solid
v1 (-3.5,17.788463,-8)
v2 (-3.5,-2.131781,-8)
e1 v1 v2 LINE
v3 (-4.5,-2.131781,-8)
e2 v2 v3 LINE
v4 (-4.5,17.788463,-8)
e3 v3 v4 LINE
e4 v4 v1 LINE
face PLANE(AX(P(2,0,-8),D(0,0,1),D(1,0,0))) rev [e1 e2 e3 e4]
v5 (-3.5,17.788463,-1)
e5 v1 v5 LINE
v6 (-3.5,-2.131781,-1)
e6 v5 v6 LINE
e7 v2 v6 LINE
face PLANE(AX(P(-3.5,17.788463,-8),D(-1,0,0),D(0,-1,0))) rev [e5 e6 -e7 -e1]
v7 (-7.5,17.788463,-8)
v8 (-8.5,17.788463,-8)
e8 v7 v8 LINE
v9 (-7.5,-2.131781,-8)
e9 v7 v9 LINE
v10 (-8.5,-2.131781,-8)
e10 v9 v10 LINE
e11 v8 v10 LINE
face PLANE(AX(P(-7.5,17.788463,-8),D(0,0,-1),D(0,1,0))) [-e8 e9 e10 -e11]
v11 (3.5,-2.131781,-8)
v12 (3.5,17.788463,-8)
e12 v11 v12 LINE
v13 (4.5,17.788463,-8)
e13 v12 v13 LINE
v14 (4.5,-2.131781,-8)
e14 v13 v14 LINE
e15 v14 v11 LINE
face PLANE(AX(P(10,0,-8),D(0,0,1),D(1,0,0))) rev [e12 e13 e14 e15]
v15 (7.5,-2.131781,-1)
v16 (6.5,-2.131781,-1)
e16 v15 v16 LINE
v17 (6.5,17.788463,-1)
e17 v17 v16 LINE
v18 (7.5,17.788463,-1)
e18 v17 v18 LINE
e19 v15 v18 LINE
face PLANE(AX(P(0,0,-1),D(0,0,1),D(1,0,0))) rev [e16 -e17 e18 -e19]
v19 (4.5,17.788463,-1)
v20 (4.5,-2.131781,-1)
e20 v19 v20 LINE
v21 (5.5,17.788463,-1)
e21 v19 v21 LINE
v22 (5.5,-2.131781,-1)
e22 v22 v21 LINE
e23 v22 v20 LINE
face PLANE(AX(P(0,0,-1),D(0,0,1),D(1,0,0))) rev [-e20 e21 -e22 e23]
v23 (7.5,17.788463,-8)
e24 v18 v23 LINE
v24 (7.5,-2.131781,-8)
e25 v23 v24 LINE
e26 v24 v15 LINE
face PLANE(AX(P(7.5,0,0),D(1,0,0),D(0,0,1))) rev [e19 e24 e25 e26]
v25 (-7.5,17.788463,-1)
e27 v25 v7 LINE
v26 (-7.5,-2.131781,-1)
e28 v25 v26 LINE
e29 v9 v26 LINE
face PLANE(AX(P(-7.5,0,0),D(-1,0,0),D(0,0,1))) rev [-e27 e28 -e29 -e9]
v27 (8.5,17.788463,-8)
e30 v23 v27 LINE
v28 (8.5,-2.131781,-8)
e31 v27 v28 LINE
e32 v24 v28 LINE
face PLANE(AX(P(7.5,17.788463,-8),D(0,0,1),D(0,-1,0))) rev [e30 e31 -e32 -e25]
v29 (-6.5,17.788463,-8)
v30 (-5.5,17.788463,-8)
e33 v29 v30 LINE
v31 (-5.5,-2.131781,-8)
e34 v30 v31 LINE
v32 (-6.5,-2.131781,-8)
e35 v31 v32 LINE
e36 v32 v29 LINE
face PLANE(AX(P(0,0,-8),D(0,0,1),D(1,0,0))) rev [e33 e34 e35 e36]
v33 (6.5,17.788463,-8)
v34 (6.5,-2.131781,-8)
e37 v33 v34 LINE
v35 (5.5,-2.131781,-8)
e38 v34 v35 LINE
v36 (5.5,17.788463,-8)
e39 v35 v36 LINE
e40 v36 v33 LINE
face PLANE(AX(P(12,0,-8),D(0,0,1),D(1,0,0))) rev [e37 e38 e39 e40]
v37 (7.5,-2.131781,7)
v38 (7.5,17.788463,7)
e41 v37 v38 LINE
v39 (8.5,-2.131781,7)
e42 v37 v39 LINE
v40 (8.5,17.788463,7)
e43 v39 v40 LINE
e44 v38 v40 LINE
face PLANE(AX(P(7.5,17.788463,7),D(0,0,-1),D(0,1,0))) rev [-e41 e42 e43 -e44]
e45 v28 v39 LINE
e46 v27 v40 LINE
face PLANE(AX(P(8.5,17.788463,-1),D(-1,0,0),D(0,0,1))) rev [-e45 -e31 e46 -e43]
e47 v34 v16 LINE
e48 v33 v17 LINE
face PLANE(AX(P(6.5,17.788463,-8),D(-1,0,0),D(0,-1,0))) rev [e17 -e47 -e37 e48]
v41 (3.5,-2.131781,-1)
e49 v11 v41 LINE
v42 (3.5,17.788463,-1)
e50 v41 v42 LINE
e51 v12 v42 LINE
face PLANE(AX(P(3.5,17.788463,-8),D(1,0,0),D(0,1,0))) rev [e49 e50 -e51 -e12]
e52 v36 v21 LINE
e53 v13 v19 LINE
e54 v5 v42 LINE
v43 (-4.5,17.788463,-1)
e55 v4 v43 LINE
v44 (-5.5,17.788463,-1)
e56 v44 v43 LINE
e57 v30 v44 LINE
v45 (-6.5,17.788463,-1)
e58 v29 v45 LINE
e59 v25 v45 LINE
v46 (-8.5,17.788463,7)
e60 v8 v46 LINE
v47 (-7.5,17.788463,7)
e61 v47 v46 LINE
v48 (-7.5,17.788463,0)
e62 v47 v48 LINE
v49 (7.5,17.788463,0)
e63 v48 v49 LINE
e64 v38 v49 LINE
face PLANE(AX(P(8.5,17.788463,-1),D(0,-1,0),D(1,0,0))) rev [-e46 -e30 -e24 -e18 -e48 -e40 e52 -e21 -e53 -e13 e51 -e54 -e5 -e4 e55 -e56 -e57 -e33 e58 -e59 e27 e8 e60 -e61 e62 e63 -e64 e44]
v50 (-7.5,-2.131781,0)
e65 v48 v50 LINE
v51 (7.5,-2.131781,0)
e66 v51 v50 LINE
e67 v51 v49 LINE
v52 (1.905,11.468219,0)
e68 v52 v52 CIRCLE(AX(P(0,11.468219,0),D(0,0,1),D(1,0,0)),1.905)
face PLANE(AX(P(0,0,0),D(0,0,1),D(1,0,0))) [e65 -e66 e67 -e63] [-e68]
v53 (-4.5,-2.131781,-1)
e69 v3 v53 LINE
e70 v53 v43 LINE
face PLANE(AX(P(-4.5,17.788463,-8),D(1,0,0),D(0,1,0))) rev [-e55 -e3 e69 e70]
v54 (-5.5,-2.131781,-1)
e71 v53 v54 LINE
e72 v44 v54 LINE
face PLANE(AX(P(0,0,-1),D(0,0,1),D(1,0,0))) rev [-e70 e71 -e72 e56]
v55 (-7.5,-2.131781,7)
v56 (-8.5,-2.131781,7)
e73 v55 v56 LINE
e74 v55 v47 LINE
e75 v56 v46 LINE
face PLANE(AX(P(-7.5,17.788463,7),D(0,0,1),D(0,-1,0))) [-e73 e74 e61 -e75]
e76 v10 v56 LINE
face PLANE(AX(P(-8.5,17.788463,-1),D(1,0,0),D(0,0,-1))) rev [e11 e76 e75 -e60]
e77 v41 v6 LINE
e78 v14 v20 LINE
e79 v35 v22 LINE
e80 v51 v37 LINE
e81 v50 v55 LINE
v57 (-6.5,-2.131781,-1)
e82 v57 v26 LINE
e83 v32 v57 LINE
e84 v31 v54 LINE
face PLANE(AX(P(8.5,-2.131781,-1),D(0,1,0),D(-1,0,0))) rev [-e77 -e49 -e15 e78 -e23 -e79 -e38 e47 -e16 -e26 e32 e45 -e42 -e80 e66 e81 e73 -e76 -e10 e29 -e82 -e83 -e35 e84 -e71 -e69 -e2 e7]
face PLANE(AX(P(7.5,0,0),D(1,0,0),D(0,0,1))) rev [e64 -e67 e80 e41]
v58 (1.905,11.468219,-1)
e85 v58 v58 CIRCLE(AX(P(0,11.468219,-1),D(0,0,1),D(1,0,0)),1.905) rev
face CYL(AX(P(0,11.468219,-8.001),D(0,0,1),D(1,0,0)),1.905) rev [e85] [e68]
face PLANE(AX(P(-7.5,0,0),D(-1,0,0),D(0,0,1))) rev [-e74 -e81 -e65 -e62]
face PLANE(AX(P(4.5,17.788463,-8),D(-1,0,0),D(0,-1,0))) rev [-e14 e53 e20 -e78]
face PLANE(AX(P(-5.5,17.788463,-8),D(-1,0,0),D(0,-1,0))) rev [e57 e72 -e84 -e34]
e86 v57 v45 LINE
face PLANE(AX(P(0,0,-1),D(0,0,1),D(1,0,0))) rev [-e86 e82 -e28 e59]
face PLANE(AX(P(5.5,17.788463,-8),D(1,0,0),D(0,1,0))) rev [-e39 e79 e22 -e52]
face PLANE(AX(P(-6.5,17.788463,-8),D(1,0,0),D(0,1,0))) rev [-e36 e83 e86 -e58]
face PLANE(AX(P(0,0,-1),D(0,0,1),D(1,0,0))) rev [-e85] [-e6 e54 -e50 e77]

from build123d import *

# Parameters (mm, degrees)
SKETCH11_W              = 17
SKETCH11_H              = 19.920243607
BOSS_EXTRUDE7_DEPTH     = 1
BOSS_EXTRUDE5_START     = -2.131780543
BOSS_EXTRUDE5_OUTLINE_W = 1
BOSS_EXTRUDE5_OUTLINE_H = 7
BOSS_EXTRUDE5_DEPTH     = 19.920243607
SKETCH13_W              = 1
SKETCH13_H              = 19.920243607
BOSS_EXTRUDE6_DEPTH     = 7
LPATTERN3_COUNT         = 7
LPATTERN3_PITCH         = 2
CUT_EXTRUDE1_REACH      = 23.276
SKETCH14_R              = 1.905


# Read off the part's stored shape, not the designer's step: Boss-Extrude5
with BuildPart() as part:
    # Sketch11 (on Front Plane) → Boss-Extrude7 (new body)
    with BuildSketch(Plane.XY):
        with Locations((0, 7.828341261)):
            Rectangle(SKETCH11_W, SKETCH11_H)
    extrude(amount=-BOSS_EXTRUDE7_DEPTH)

    # Boss-Extrude5 outline → Boss-Extrude5 (add)
    with BuildSketch(Plane(origin=(0, 0, 0), x_dir=(1, 0, 0), z_dir=(0, 1, 0)).offset(BOSS_EXTRUDE5_START)):
        with Locations((-8, 4.5)):
            Rectangle(BOSS_EXTRUDE5_OUTLINE_W, BOSS_EXTRUDE5_OUTLINE_H)
        with Locations((-8, -3.5)):
            Rectangle(BOSS_EXTRUDE5_OUTLINE_W, BOSS_EXTRUDE5_OUTLINE_H)
    boss_extrude5 = extrude(amount=BOSS_EXTRUDE5_DEPTH)

    # Mirror1: Boss-Extrude5 across plane
    add(boss_extrude5.mirror(Plane(origin=(0, 0, 0), x_dir=(0, 0, 1), z_dir=(1, 0, 0))))

    # Sketch13 → Boss-Extrude6 (add, through all)
    with BuildSketch(Plane(origin=(0, 0, -1), x_dir=(-1, 0, 0), z_dir=(0, 0, -1))):
        with Locations((6, 7.828341261)):
            Rectangle(SKETCH13_W, SKETCH13_H)
    boss_extrude6 = extrude(amount=BOSS_EXTRUDE6_DEPTH)

    # LPattern3: Boss-Extrude6 ×7, 3 skipped
    with Locations(*[(i * LPATTERN3_PITCH, 0, 0) for i in range(1, LPATTERN3_COUNT) if i not in (2, 3, 4)]):
        add(boss_extrude6)

    # Sketch14 → Cut-Extrude1 (cut, up to next)
    with BuildSketch(Plane.XY, mode=Mode.PRIVATE) as cut_extrude1_sk1:
        with Locations((0, 11.468219457)):
            Circle(SKETCH14_R)
    cut_extrude1_tool1 = extrude(cut_extrude1_sk1.sketch, amount=-CUT_EXTRUDE1_REACH, mode=Mode.PRIVATE) & part.part
    add(cut_extrude1_tool1.solids().sort_by_distance((0, 11.468219, 0))[0], mode=Mode.SUBTRACT)


solid = part.part
